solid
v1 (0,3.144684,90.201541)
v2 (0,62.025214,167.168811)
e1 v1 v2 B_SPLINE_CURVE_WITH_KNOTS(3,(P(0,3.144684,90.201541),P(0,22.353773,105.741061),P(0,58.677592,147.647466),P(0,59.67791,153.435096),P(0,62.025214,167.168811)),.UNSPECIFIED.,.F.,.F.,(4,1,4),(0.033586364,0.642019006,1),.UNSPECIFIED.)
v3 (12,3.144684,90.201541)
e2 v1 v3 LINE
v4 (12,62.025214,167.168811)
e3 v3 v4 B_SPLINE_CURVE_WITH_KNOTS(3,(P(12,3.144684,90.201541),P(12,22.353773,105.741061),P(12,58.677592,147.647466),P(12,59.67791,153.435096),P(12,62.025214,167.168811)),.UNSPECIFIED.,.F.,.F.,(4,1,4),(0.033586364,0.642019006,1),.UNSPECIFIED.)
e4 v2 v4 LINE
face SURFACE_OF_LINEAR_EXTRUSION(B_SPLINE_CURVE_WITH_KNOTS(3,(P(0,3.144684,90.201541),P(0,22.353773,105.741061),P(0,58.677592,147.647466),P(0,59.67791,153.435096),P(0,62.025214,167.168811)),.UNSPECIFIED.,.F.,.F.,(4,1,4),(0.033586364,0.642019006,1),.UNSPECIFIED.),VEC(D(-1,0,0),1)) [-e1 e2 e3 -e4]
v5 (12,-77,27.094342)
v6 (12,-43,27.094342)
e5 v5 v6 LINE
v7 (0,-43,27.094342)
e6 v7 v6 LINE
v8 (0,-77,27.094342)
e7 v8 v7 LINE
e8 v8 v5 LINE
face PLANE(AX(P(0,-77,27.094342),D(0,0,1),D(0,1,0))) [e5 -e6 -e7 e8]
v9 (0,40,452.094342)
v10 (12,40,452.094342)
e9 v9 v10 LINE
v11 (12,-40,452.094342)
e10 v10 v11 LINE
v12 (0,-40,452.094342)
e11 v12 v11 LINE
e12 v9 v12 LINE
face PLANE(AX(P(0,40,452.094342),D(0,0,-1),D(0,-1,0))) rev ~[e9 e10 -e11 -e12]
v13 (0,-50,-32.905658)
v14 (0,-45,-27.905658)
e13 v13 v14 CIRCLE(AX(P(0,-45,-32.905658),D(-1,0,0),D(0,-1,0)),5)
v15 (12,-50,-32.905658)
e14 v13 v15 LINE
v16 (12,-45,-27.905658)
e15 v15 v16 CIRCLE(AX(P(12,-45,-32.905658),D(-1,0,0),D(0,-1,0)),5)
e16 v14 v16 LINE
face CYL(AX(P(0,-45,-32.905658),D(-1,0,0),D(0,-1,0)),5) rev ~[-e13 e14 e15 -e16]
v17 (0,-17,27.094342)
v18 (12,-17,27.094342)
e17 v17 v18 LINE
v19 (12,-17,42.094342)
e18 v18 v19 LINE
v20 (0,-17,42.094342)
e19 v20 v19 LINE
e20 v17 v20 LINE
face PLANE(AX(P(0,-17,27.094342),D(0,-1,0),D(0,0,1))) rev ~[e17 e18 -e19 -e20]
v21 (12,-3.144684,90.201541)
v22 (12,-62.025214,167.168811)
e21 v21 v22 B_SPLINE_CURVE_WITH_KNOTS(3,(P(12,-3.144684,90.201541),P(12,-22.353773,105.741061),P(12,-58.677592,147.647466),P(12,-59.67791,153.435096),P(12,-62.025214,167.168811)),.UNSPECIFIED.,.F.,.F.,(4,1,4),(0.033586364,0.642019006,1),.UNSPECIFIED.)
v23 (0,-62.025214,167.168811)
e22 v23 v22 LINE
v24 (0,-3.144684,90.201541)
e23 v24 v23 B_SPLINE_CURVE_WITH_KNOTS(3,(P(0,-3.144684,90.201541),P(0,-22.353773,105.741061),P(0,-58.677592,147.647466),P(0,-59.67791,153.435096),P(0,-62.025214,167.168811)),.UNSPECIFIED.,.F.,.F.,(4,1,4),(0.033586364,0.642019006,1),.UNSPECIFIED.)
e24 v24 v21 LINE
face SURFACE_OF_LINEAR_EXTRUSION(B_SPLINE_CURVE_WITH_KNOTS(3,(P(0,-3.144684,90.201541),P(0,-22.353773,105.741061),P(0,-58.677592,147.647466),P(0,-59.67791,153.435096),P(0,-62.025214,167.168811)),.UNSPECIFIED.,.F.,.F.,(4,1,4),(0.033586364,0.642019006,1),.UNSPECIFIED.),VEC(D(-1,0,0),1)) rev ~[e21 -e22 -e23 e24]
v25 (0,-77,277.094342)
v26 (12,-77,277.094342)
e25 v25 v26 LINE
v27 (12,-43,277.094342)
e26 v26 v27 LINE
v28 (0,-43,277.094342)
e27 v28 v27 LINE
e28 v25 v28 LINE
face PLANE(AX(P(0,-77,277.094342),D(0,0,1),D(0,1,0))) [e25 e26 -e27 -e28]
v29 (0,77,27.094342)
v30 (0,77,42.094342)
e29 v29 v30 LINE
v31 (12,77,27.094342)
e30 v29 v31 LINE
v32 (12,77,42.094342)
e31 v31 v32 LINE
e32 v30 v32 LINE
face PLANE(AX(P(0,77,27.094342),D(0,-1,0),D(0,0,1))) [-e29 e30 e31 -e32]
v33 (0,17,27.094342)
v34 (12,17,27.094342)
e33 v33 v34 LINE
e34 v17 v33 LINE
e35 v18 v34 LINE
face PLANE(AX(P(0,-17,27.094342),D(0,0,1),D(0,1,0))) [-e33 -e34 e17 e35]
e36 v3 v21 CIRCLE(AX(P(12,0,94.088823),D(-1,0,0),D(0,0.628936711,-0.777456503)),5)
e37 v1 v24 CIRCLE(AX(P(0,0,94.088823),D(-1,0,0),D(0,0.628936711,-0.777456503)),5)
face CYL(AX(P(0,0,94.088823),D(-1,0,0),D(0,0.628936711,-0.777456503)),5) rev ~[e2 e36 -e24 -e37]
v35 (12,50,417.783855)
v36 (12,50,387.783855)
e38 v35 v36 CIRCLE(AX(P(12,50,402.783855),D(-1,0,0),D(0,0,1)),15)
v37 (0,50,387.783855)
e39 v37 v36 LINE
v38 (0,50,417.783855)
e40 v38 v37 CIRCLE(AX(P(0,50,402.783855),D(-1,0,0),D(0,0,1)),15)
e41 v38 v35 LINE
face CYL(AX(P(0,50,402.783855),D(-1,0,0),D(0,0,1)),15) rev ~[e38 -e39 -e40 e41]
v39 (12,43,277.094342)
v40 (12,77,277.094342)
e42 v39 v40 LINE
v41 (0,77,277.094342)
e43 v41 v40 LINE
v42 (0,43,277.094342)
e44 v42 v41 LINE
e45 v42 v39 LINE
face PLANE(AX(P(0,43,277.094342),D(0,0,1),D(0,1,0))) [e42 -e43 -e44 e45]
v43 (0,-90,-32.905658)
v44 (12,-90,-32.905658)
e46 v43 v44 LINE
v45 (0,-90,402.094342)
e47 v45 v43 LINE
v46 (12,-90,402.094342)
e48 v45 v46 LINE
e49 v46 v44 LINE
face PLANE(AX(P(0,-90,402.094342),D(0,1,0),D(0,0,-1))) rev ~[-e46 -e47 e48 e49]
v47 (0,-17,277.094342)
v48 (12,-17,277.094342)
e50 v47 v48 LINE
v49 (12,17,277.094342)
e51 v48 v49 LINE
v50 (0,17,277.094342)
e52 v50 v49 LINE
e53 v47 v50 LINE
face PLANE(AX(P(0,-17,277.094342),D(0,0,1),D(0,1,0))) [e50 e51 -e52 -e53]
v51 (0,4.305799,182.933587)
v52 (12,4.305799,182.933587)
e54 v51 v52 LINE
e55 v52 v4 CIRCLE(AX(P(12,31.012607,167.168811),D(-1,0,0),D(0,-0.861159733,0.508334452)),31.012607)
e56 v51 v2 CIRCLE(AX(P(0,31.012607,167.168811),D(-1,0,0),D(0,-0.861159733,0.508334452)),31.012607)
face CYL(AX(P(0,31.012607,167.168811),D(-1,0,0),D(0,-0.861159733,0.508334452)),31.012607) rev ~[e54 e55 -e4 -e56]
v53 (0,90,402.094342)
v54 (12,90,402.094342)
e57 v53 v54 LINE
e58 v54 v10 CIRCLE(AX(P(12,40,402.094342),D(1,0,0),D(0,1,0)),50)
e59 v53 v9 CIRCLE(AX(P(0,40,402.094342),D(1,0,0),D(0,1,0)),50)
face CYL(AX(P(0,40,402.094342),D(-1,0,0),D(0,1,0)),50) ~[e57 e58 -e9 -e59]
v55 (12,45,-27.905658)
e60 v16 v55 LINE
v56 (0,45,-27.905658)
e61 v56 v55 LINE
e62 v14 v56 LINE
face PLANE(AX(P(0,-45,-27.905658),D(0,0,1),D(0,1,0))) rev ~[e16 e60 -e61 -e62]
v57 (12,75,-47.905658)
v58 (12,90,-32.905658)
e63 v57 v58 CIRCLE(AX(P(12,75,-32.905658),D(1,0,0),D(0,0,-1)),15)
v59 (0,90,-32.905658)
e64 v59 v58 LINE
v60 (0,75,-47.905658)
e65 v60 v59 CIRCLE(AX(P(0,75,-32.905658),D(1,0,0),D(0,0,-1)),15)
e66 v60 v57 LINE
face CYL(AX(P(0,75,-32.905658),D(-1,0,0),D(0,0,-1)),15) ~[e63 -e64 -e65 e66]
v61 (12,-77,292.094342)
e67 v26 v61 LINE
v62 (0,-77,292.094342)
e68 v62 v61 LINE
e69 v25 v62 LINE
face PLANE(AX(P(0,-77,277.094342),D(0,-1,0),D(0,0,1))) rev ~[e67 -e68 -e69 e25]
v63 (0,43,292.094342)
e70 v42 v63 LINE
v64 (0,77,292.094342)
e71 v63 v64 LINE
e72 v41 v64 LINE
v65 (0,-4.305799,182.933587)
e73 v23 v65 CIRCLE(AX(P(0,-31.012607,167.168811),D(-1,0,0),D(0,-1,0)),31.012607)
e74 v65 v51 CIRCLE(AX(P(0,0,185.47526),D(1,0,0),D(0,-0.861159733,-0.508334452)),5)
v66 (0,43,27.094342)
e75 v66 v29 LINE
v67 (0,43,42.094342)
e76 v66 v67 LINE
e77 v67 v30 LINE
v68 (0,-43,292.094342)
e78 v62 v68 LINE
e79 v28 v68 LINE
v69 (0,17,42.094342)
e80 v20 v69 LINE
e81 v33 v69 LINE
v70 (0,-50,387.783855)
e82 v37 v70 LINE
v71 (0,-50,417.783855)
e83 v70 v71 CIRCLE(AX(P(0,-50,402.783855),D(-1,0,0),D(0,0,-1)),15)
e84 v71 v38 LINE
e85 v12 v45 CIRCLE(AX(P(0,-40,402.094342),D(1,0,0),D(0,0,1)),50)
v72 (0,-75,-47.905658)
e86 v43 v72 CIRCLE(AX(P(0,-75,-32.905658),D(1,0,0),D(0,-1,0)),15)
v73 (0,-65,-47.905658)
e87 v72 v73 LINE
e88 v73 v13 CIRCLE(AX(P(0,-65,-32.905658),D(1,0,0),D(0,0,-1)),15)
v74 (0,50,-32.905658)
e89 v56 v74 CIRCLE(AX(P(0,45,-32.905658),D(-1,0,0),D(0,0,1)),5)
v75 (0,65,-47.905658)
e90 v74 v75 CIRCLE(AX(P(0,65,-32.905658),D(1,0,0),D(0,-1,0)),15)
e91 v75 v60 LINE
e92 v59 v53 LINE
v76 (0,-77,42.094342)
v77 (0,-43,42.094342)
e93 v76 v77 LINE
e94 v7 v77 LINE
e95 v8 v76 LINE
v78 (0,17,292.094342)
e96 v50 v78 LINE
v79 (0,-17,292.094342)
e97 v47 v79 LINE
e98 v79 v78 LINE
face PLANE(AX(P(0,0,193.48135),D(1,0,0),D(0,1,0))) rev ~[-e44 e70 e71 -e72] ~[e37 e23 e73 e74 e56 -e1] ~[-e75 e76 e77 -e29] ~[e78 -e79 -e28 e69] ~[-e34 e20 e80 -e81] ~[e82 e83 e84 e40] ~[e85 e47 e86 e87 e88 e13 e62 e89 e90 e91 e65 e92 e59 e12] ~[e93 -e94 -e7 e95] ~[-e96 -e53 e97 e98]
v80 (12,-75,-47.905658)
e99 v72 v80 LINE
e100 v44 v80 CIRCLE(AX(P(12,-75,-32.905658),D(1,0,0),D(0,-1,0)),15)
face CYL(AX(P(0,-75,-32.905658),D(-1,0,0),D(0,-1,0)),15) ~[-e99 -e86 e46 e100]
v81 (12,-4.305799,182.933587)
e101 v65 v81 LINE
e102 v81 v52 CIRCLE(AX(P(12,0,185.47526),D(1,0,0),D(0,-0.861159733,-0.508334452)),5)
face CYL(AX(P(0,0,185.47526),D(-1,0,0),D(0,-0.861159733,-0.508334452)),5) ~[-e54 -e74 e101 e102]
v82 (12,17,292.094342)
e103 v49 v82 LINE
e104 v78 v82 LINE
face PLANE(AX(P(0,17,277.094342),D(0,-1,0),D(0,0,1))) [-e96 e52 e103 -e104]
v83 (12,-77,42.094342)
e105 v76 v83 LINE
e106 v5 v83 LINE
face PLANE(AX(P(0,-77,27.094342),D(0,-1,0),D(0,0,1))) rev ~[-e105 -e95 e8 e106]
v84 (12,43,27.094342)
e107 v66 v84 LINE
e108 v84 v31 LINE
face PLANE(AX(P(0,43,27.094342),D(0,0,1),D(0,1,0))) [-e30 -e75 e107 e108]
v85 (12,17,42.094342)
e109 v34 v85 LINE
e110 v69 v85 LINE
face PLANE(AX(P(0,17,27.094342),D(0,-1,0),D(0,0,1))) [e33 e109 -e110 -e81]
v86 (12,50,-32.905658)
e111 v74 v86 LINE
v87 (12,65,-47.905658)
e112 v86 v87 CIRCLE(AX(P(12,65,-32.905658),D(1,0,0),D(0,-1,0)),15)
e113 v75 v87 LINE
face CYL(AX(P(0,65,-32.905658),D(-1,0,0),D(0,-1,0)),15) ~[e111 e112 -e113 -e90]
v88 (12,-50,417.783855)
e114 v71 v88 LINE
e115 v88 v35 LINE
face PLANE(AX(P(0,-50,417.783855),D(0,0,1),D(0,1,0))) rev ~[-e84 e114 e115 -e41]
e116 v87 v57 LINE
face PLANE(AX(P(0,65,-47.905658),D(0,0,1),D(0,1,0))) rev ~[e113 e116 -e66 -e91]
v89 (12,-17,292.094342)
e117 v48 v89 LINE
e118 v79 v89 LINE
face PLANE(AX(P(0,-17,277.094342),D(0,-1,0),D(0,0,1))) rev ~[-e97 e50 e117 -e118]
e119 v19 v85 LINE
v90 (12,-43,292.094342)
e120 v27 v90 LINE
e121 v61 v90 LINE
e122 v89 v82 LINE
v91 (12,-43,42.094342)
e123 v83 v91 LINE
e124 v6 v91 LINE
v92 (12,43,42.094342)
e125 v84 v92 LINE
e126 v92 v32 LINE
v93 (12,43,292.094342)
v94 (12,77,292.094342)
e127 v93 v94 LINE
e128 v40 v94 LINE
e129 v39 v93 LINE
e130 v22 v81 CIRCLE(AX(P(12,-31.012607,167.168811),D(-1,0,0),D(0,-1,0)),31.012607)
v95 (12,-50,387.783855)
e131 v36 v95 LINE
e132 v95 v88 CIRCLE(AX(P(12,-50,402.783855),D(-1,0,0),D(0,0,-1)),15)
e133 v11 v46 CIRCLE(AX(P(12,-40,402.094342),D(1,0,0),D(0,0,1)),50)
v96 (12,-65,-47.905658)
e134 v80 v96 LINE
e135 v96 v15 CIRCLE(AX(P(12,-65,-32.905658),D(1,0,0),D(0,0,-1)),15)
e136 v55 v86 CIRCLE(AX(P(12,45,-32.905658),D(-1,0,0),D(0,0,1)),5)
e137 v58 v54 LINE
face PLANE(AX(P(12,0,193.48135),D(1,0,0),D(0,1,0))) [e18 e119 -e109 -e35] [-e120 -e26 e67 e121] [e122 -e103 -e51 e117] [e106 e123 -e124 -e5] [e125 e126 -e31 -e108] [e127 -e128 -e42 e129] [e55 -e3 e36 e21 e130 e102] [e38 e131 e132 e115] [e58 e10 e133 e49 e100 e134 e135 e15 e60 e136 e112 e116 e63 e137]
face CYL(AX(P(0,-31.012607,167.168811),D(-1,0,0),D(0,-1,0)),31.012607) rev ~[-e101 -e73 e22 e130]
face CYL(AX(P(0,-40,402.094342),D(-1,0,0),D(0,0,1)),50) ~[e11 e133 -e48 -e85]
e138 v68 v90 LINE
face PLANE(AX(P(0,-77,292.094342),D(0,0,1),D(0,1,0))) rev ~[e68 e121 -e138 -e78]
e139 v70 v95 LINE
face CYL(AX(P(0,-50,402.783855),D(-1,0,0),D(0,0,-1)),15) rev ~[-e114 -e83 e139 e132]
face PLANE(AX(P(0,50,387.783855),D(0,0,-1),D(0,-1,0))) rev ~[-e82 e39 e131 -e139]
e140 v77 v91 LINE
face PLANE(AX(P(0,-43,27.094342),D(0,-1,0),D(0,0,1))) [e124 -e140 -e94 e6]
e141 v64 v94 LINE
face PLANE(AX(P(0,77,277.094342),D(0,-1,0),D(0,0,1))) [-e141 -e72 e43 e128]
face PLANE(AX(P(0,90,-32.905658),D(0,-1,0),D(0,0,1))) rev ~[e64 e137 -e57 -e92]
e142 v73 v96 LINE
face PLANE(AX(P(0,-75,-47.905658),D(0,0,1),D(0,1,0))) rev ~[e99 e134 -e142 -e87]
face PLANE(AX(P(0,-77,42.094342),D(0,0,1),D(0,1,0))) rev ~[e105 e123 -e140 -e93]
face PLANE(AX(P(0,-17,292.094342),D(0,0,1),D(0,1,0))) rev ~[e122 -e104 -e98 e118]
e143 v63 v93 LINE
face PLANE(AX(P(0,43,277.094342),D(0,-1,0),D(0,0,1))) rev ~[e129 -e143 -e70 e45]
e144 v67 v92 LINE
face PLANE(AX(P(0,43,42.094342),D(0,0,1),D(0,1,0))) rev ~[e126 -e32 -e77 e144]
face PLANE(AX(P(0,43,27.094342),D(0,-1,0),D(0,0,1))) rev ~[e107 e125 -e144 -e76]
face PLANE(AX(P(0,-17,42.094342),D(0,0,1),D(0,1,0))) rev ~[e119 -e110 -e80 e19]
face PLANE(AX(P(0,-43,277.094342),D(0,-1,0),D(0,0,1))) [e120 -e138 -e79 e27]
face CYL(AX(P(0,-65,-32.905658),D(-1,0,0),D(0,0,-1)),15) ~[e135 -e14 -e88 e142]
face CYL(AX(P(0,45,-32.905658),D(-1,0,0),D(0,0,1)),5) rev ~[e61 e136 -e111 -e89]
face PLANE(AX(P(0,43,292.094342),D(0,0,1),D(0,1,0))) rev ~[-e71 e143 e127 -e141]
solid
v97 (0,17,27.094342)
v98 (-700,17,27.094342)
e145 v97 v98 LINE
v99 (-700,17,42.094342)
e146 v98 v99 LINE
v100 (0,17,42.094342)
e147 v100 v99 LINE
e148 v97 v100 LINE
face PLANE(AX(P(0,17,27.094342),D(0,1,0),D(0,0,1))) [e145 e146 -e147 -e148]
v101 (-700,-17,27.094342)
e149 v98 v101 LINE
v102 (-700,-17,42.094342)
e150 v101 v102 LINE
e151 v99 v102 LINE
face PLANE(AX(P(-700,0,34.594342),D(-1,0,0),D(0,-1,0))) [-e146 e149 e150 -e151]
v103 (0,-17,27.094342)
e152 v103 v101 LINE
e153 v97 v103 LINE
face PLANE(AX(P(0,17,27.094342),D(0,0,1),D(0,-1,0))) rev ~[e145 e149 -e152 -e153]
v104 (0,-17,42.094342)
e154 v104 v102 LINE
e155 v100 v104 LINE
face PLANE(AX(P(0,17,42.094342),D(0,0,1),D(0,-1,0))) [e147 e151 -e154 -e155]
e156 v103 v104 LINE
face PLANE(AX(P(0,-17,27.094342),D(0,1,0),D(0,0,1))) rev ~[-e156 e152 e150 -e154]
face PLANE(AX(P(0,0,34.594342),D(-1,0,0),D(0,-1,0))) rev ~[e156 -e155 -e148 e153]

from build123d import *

# Parameters (mm, degrees)
F0_W     = 34
F0_H     = 15
F1_DEPTH = 12
F2_W     = 34
F2_H     = 15
F3_DEPTH = 700


with BuildPart() as f1:
    # F0 (on Right) → F1 (new body)
    with BuildSketch(Plane.YZ):
        with BuildLine():
            Line((0, 452.0943418145), (-40, 452.0943418145))
            ThreePointArc((-40, 452.0943418145), (-75.3553390593, 437.4496808738), (-90, 402.0943418145))
            Line((-90, 402.0943418145), (-90, -32.9056581855))
            ThreePointArc((-90, -32.9056581855), (-85.6066017178, -43.5122599033), (-75, -47.9056581855))
            Line((-75, -47.9056581855), (-65, -47.9056581855))
            ThreePointArc((-65, -47.9056581855), (-54.3933982822, -43.5122599033), (-50, -32.9056581855))
            ThreePointArc((-50, -32.9056581855), (-48.5355339059, -29.3701242795), (-45, -27.9056581855))
            Line((-45, -27.9056581855), (45, -27.9056581855))
            ThreePointArc((45, -27.9056581855), (48.5355339059, -29.3701242795), (50, -32.9056581855))
            ThreePointArc((50, -32.9056581855), (54.3933982822, -43.5122599033), (65, -47.9056581855))
            Line((65, -47.9056581855), (75, -47.9056581855))
            ThreePointArc((75, -47.9056581855), (85.6066017178, -43.5122599033), (90, -32.9056581855))
            Line((90, -32.9056581855), (90, 402.0943418145))
            ThreePointArc((90, 402.0943418145), (75.3553390593, 437.4496808738), (40, 452.0943418145))
            Line((40, 452.0943418145), (0, 452.0943418145))
        make_face()
        with Locations((-60, 34.5943418145)):
            Rectangle(F0_W, F0_H, mode=Mode.SUBTRACT)
        with Locations((0, 34.5943418145)):
            Rectangle(F0_W, F0_H, mode=Mode.SUBTRACT)
        with Locations((60, 34.5943418145)):
            Rectangle(F0_W, F0_H, mode=Mode.SUBTRACT)
        with BuildLine():
            ThreePointArc((4.3057986639, 182.9335873252), (39.183716083, 197.0856083174), (62.0252142978, 167.1688106786))
            add(Edge.make_bspline(
                [(3.1446835541, 90.2015406127), (22.3537729205, 105.7410613962), (58.6775915843, 147.6474664313), (59.6779100597, 153.4350961447), (62.0252142978, 167.1688106786)],
                knots=[0.0335863635, 0.0335863635, 0.0335863635, 0.0335863635, 0.6420190055, 1, 1, 1, 1], degree=3))
            add(Edge.make_bspline(
                [(0, 87.7314905125), (1.0350959007, 88.5189757858), (2.0843139865, 89.3437365482), (3.1446835541, 90.2015406127)],
                knots=[0, 0, 0, 0, 0.0335863635, 0.0335863635, 0.0335863635, 0.0335863635], degree=3))
            add(Edge.make_bspline(
                [(0, 87.7314905125), (-1.0350959007, 88.5189757858), (-2.0843139865, 89.3437365482), (-3.1446835541, 90.2015406127)],
                knots=[0, 0, 0, 0, 0.0335863635, 0.0335863635, 0.0335863635, 0.0335863635], degree=3))
            add(Edge.make_bspline(
                [(-3.1446835541, 90.2015406127), (-22.3537729205, 105.7410613962), (-58.6775915843, 147.6474664313), (-59.6779100597, 153.4350961447), (-62.0252142978, 167.1688106786)],
                knots=[0.0335863635, 0.0335863635, 0.0335863635, 0.0335863635, 0.6420190055, 1, 1, 1, 1], degree=3))
            ThreePointArc((-62.0252142978, 167.1688106786), (-39.183716083, 197.0856083174), (-4.3057986639, 182.9335873252))
            ThreePointArc((-4.3057986639, 182.9335873252), (0, 180.475259583), (4.3057986639, 182.9335873252))
        make_face(mode=Mode.SUBTRACT)
        with Locations((-60, 284.5943418145)):
            Rectangle(F0_W, F0_H, mode=Mode.SUBTRACT)
        with Locations((0, 284.5943418145)):
            Rectangle(F0_W, F0_H, mode=Mode.SUBTRACT)
        with Locations((60, 284.5943418145)):
            Rectangle(F0_W, F0_H, mode=Mode.SUBTRACT)
        with BuildLine():
            Line((-50, 417.7838551998), (0, 417.7838551998))
            Line((0, 417.7838551998), (50, 417.7838551998))
            ThreePointArc((50, 417.7838551998), (60.6066017178, 413.3904569176), (65, 402.7838551998))
            ThreePointArc((65, 402.7838551998), (60.6066017178, 392.177253482), (50, 387.7838551998))
            Line((50, 387.7838551998), (-50, 387.7838551998))
            ThreePointArc((-50, 387.7838551998), (-60.6066017178, 392.177253482), (-65, 402.7838551998))
            ThreePointArc((-65, 402.7838551998), (-60.6066017178, 413.3904569176), (-50, 417.7838551998))
        make_face(mode=Mode.SUBTRACT)
        with BuildLine():
            add(Edge.make_bspline(
                [(0, 87.7314905125), (1.0350959007, 88.5189757858), (2.0843139865, 89.3437365482), (3.1446835541, 90.2015406127)],
                knots=[0, 0, 0, 0, 0.0335863635, 0.0335863635, 0.0335863635, 0.0335863635], degree=3))
            ThreePointArc((3.1446835541, 90.2015406127), (0, 89.0888231268), (-3.1446835541, 90.2015406127))
            add(Edge.make_bspline(
                [(0, 87.7314905125), (-1.0350959007, 88.5189757858), (-2.0843139865, 89.3437365482), (-3.1446835541, 90.2015406127)],
                knots=[0, 0, 0, 0, 0.0335863635, 0.0335863635, 0.0335863635, 0.0335863635], degree=3))
        make_face()
    extrude(amount=F1_DEPTH)


with BuildPart() as f3:
    # F2 (on face) → F3 (new body)
    with BuildSketch(Plane(origin=(0, 0, 0), x_dir=(0, -1, 0), z_dir=(-1, 0, 0))):
        with Locations((0, 34.5943418145)):
            Rectangle(F2_W, F2_H)
    extrude(amount=F3_DEPTH)


solid = Compound([f1.part, f3.part])
